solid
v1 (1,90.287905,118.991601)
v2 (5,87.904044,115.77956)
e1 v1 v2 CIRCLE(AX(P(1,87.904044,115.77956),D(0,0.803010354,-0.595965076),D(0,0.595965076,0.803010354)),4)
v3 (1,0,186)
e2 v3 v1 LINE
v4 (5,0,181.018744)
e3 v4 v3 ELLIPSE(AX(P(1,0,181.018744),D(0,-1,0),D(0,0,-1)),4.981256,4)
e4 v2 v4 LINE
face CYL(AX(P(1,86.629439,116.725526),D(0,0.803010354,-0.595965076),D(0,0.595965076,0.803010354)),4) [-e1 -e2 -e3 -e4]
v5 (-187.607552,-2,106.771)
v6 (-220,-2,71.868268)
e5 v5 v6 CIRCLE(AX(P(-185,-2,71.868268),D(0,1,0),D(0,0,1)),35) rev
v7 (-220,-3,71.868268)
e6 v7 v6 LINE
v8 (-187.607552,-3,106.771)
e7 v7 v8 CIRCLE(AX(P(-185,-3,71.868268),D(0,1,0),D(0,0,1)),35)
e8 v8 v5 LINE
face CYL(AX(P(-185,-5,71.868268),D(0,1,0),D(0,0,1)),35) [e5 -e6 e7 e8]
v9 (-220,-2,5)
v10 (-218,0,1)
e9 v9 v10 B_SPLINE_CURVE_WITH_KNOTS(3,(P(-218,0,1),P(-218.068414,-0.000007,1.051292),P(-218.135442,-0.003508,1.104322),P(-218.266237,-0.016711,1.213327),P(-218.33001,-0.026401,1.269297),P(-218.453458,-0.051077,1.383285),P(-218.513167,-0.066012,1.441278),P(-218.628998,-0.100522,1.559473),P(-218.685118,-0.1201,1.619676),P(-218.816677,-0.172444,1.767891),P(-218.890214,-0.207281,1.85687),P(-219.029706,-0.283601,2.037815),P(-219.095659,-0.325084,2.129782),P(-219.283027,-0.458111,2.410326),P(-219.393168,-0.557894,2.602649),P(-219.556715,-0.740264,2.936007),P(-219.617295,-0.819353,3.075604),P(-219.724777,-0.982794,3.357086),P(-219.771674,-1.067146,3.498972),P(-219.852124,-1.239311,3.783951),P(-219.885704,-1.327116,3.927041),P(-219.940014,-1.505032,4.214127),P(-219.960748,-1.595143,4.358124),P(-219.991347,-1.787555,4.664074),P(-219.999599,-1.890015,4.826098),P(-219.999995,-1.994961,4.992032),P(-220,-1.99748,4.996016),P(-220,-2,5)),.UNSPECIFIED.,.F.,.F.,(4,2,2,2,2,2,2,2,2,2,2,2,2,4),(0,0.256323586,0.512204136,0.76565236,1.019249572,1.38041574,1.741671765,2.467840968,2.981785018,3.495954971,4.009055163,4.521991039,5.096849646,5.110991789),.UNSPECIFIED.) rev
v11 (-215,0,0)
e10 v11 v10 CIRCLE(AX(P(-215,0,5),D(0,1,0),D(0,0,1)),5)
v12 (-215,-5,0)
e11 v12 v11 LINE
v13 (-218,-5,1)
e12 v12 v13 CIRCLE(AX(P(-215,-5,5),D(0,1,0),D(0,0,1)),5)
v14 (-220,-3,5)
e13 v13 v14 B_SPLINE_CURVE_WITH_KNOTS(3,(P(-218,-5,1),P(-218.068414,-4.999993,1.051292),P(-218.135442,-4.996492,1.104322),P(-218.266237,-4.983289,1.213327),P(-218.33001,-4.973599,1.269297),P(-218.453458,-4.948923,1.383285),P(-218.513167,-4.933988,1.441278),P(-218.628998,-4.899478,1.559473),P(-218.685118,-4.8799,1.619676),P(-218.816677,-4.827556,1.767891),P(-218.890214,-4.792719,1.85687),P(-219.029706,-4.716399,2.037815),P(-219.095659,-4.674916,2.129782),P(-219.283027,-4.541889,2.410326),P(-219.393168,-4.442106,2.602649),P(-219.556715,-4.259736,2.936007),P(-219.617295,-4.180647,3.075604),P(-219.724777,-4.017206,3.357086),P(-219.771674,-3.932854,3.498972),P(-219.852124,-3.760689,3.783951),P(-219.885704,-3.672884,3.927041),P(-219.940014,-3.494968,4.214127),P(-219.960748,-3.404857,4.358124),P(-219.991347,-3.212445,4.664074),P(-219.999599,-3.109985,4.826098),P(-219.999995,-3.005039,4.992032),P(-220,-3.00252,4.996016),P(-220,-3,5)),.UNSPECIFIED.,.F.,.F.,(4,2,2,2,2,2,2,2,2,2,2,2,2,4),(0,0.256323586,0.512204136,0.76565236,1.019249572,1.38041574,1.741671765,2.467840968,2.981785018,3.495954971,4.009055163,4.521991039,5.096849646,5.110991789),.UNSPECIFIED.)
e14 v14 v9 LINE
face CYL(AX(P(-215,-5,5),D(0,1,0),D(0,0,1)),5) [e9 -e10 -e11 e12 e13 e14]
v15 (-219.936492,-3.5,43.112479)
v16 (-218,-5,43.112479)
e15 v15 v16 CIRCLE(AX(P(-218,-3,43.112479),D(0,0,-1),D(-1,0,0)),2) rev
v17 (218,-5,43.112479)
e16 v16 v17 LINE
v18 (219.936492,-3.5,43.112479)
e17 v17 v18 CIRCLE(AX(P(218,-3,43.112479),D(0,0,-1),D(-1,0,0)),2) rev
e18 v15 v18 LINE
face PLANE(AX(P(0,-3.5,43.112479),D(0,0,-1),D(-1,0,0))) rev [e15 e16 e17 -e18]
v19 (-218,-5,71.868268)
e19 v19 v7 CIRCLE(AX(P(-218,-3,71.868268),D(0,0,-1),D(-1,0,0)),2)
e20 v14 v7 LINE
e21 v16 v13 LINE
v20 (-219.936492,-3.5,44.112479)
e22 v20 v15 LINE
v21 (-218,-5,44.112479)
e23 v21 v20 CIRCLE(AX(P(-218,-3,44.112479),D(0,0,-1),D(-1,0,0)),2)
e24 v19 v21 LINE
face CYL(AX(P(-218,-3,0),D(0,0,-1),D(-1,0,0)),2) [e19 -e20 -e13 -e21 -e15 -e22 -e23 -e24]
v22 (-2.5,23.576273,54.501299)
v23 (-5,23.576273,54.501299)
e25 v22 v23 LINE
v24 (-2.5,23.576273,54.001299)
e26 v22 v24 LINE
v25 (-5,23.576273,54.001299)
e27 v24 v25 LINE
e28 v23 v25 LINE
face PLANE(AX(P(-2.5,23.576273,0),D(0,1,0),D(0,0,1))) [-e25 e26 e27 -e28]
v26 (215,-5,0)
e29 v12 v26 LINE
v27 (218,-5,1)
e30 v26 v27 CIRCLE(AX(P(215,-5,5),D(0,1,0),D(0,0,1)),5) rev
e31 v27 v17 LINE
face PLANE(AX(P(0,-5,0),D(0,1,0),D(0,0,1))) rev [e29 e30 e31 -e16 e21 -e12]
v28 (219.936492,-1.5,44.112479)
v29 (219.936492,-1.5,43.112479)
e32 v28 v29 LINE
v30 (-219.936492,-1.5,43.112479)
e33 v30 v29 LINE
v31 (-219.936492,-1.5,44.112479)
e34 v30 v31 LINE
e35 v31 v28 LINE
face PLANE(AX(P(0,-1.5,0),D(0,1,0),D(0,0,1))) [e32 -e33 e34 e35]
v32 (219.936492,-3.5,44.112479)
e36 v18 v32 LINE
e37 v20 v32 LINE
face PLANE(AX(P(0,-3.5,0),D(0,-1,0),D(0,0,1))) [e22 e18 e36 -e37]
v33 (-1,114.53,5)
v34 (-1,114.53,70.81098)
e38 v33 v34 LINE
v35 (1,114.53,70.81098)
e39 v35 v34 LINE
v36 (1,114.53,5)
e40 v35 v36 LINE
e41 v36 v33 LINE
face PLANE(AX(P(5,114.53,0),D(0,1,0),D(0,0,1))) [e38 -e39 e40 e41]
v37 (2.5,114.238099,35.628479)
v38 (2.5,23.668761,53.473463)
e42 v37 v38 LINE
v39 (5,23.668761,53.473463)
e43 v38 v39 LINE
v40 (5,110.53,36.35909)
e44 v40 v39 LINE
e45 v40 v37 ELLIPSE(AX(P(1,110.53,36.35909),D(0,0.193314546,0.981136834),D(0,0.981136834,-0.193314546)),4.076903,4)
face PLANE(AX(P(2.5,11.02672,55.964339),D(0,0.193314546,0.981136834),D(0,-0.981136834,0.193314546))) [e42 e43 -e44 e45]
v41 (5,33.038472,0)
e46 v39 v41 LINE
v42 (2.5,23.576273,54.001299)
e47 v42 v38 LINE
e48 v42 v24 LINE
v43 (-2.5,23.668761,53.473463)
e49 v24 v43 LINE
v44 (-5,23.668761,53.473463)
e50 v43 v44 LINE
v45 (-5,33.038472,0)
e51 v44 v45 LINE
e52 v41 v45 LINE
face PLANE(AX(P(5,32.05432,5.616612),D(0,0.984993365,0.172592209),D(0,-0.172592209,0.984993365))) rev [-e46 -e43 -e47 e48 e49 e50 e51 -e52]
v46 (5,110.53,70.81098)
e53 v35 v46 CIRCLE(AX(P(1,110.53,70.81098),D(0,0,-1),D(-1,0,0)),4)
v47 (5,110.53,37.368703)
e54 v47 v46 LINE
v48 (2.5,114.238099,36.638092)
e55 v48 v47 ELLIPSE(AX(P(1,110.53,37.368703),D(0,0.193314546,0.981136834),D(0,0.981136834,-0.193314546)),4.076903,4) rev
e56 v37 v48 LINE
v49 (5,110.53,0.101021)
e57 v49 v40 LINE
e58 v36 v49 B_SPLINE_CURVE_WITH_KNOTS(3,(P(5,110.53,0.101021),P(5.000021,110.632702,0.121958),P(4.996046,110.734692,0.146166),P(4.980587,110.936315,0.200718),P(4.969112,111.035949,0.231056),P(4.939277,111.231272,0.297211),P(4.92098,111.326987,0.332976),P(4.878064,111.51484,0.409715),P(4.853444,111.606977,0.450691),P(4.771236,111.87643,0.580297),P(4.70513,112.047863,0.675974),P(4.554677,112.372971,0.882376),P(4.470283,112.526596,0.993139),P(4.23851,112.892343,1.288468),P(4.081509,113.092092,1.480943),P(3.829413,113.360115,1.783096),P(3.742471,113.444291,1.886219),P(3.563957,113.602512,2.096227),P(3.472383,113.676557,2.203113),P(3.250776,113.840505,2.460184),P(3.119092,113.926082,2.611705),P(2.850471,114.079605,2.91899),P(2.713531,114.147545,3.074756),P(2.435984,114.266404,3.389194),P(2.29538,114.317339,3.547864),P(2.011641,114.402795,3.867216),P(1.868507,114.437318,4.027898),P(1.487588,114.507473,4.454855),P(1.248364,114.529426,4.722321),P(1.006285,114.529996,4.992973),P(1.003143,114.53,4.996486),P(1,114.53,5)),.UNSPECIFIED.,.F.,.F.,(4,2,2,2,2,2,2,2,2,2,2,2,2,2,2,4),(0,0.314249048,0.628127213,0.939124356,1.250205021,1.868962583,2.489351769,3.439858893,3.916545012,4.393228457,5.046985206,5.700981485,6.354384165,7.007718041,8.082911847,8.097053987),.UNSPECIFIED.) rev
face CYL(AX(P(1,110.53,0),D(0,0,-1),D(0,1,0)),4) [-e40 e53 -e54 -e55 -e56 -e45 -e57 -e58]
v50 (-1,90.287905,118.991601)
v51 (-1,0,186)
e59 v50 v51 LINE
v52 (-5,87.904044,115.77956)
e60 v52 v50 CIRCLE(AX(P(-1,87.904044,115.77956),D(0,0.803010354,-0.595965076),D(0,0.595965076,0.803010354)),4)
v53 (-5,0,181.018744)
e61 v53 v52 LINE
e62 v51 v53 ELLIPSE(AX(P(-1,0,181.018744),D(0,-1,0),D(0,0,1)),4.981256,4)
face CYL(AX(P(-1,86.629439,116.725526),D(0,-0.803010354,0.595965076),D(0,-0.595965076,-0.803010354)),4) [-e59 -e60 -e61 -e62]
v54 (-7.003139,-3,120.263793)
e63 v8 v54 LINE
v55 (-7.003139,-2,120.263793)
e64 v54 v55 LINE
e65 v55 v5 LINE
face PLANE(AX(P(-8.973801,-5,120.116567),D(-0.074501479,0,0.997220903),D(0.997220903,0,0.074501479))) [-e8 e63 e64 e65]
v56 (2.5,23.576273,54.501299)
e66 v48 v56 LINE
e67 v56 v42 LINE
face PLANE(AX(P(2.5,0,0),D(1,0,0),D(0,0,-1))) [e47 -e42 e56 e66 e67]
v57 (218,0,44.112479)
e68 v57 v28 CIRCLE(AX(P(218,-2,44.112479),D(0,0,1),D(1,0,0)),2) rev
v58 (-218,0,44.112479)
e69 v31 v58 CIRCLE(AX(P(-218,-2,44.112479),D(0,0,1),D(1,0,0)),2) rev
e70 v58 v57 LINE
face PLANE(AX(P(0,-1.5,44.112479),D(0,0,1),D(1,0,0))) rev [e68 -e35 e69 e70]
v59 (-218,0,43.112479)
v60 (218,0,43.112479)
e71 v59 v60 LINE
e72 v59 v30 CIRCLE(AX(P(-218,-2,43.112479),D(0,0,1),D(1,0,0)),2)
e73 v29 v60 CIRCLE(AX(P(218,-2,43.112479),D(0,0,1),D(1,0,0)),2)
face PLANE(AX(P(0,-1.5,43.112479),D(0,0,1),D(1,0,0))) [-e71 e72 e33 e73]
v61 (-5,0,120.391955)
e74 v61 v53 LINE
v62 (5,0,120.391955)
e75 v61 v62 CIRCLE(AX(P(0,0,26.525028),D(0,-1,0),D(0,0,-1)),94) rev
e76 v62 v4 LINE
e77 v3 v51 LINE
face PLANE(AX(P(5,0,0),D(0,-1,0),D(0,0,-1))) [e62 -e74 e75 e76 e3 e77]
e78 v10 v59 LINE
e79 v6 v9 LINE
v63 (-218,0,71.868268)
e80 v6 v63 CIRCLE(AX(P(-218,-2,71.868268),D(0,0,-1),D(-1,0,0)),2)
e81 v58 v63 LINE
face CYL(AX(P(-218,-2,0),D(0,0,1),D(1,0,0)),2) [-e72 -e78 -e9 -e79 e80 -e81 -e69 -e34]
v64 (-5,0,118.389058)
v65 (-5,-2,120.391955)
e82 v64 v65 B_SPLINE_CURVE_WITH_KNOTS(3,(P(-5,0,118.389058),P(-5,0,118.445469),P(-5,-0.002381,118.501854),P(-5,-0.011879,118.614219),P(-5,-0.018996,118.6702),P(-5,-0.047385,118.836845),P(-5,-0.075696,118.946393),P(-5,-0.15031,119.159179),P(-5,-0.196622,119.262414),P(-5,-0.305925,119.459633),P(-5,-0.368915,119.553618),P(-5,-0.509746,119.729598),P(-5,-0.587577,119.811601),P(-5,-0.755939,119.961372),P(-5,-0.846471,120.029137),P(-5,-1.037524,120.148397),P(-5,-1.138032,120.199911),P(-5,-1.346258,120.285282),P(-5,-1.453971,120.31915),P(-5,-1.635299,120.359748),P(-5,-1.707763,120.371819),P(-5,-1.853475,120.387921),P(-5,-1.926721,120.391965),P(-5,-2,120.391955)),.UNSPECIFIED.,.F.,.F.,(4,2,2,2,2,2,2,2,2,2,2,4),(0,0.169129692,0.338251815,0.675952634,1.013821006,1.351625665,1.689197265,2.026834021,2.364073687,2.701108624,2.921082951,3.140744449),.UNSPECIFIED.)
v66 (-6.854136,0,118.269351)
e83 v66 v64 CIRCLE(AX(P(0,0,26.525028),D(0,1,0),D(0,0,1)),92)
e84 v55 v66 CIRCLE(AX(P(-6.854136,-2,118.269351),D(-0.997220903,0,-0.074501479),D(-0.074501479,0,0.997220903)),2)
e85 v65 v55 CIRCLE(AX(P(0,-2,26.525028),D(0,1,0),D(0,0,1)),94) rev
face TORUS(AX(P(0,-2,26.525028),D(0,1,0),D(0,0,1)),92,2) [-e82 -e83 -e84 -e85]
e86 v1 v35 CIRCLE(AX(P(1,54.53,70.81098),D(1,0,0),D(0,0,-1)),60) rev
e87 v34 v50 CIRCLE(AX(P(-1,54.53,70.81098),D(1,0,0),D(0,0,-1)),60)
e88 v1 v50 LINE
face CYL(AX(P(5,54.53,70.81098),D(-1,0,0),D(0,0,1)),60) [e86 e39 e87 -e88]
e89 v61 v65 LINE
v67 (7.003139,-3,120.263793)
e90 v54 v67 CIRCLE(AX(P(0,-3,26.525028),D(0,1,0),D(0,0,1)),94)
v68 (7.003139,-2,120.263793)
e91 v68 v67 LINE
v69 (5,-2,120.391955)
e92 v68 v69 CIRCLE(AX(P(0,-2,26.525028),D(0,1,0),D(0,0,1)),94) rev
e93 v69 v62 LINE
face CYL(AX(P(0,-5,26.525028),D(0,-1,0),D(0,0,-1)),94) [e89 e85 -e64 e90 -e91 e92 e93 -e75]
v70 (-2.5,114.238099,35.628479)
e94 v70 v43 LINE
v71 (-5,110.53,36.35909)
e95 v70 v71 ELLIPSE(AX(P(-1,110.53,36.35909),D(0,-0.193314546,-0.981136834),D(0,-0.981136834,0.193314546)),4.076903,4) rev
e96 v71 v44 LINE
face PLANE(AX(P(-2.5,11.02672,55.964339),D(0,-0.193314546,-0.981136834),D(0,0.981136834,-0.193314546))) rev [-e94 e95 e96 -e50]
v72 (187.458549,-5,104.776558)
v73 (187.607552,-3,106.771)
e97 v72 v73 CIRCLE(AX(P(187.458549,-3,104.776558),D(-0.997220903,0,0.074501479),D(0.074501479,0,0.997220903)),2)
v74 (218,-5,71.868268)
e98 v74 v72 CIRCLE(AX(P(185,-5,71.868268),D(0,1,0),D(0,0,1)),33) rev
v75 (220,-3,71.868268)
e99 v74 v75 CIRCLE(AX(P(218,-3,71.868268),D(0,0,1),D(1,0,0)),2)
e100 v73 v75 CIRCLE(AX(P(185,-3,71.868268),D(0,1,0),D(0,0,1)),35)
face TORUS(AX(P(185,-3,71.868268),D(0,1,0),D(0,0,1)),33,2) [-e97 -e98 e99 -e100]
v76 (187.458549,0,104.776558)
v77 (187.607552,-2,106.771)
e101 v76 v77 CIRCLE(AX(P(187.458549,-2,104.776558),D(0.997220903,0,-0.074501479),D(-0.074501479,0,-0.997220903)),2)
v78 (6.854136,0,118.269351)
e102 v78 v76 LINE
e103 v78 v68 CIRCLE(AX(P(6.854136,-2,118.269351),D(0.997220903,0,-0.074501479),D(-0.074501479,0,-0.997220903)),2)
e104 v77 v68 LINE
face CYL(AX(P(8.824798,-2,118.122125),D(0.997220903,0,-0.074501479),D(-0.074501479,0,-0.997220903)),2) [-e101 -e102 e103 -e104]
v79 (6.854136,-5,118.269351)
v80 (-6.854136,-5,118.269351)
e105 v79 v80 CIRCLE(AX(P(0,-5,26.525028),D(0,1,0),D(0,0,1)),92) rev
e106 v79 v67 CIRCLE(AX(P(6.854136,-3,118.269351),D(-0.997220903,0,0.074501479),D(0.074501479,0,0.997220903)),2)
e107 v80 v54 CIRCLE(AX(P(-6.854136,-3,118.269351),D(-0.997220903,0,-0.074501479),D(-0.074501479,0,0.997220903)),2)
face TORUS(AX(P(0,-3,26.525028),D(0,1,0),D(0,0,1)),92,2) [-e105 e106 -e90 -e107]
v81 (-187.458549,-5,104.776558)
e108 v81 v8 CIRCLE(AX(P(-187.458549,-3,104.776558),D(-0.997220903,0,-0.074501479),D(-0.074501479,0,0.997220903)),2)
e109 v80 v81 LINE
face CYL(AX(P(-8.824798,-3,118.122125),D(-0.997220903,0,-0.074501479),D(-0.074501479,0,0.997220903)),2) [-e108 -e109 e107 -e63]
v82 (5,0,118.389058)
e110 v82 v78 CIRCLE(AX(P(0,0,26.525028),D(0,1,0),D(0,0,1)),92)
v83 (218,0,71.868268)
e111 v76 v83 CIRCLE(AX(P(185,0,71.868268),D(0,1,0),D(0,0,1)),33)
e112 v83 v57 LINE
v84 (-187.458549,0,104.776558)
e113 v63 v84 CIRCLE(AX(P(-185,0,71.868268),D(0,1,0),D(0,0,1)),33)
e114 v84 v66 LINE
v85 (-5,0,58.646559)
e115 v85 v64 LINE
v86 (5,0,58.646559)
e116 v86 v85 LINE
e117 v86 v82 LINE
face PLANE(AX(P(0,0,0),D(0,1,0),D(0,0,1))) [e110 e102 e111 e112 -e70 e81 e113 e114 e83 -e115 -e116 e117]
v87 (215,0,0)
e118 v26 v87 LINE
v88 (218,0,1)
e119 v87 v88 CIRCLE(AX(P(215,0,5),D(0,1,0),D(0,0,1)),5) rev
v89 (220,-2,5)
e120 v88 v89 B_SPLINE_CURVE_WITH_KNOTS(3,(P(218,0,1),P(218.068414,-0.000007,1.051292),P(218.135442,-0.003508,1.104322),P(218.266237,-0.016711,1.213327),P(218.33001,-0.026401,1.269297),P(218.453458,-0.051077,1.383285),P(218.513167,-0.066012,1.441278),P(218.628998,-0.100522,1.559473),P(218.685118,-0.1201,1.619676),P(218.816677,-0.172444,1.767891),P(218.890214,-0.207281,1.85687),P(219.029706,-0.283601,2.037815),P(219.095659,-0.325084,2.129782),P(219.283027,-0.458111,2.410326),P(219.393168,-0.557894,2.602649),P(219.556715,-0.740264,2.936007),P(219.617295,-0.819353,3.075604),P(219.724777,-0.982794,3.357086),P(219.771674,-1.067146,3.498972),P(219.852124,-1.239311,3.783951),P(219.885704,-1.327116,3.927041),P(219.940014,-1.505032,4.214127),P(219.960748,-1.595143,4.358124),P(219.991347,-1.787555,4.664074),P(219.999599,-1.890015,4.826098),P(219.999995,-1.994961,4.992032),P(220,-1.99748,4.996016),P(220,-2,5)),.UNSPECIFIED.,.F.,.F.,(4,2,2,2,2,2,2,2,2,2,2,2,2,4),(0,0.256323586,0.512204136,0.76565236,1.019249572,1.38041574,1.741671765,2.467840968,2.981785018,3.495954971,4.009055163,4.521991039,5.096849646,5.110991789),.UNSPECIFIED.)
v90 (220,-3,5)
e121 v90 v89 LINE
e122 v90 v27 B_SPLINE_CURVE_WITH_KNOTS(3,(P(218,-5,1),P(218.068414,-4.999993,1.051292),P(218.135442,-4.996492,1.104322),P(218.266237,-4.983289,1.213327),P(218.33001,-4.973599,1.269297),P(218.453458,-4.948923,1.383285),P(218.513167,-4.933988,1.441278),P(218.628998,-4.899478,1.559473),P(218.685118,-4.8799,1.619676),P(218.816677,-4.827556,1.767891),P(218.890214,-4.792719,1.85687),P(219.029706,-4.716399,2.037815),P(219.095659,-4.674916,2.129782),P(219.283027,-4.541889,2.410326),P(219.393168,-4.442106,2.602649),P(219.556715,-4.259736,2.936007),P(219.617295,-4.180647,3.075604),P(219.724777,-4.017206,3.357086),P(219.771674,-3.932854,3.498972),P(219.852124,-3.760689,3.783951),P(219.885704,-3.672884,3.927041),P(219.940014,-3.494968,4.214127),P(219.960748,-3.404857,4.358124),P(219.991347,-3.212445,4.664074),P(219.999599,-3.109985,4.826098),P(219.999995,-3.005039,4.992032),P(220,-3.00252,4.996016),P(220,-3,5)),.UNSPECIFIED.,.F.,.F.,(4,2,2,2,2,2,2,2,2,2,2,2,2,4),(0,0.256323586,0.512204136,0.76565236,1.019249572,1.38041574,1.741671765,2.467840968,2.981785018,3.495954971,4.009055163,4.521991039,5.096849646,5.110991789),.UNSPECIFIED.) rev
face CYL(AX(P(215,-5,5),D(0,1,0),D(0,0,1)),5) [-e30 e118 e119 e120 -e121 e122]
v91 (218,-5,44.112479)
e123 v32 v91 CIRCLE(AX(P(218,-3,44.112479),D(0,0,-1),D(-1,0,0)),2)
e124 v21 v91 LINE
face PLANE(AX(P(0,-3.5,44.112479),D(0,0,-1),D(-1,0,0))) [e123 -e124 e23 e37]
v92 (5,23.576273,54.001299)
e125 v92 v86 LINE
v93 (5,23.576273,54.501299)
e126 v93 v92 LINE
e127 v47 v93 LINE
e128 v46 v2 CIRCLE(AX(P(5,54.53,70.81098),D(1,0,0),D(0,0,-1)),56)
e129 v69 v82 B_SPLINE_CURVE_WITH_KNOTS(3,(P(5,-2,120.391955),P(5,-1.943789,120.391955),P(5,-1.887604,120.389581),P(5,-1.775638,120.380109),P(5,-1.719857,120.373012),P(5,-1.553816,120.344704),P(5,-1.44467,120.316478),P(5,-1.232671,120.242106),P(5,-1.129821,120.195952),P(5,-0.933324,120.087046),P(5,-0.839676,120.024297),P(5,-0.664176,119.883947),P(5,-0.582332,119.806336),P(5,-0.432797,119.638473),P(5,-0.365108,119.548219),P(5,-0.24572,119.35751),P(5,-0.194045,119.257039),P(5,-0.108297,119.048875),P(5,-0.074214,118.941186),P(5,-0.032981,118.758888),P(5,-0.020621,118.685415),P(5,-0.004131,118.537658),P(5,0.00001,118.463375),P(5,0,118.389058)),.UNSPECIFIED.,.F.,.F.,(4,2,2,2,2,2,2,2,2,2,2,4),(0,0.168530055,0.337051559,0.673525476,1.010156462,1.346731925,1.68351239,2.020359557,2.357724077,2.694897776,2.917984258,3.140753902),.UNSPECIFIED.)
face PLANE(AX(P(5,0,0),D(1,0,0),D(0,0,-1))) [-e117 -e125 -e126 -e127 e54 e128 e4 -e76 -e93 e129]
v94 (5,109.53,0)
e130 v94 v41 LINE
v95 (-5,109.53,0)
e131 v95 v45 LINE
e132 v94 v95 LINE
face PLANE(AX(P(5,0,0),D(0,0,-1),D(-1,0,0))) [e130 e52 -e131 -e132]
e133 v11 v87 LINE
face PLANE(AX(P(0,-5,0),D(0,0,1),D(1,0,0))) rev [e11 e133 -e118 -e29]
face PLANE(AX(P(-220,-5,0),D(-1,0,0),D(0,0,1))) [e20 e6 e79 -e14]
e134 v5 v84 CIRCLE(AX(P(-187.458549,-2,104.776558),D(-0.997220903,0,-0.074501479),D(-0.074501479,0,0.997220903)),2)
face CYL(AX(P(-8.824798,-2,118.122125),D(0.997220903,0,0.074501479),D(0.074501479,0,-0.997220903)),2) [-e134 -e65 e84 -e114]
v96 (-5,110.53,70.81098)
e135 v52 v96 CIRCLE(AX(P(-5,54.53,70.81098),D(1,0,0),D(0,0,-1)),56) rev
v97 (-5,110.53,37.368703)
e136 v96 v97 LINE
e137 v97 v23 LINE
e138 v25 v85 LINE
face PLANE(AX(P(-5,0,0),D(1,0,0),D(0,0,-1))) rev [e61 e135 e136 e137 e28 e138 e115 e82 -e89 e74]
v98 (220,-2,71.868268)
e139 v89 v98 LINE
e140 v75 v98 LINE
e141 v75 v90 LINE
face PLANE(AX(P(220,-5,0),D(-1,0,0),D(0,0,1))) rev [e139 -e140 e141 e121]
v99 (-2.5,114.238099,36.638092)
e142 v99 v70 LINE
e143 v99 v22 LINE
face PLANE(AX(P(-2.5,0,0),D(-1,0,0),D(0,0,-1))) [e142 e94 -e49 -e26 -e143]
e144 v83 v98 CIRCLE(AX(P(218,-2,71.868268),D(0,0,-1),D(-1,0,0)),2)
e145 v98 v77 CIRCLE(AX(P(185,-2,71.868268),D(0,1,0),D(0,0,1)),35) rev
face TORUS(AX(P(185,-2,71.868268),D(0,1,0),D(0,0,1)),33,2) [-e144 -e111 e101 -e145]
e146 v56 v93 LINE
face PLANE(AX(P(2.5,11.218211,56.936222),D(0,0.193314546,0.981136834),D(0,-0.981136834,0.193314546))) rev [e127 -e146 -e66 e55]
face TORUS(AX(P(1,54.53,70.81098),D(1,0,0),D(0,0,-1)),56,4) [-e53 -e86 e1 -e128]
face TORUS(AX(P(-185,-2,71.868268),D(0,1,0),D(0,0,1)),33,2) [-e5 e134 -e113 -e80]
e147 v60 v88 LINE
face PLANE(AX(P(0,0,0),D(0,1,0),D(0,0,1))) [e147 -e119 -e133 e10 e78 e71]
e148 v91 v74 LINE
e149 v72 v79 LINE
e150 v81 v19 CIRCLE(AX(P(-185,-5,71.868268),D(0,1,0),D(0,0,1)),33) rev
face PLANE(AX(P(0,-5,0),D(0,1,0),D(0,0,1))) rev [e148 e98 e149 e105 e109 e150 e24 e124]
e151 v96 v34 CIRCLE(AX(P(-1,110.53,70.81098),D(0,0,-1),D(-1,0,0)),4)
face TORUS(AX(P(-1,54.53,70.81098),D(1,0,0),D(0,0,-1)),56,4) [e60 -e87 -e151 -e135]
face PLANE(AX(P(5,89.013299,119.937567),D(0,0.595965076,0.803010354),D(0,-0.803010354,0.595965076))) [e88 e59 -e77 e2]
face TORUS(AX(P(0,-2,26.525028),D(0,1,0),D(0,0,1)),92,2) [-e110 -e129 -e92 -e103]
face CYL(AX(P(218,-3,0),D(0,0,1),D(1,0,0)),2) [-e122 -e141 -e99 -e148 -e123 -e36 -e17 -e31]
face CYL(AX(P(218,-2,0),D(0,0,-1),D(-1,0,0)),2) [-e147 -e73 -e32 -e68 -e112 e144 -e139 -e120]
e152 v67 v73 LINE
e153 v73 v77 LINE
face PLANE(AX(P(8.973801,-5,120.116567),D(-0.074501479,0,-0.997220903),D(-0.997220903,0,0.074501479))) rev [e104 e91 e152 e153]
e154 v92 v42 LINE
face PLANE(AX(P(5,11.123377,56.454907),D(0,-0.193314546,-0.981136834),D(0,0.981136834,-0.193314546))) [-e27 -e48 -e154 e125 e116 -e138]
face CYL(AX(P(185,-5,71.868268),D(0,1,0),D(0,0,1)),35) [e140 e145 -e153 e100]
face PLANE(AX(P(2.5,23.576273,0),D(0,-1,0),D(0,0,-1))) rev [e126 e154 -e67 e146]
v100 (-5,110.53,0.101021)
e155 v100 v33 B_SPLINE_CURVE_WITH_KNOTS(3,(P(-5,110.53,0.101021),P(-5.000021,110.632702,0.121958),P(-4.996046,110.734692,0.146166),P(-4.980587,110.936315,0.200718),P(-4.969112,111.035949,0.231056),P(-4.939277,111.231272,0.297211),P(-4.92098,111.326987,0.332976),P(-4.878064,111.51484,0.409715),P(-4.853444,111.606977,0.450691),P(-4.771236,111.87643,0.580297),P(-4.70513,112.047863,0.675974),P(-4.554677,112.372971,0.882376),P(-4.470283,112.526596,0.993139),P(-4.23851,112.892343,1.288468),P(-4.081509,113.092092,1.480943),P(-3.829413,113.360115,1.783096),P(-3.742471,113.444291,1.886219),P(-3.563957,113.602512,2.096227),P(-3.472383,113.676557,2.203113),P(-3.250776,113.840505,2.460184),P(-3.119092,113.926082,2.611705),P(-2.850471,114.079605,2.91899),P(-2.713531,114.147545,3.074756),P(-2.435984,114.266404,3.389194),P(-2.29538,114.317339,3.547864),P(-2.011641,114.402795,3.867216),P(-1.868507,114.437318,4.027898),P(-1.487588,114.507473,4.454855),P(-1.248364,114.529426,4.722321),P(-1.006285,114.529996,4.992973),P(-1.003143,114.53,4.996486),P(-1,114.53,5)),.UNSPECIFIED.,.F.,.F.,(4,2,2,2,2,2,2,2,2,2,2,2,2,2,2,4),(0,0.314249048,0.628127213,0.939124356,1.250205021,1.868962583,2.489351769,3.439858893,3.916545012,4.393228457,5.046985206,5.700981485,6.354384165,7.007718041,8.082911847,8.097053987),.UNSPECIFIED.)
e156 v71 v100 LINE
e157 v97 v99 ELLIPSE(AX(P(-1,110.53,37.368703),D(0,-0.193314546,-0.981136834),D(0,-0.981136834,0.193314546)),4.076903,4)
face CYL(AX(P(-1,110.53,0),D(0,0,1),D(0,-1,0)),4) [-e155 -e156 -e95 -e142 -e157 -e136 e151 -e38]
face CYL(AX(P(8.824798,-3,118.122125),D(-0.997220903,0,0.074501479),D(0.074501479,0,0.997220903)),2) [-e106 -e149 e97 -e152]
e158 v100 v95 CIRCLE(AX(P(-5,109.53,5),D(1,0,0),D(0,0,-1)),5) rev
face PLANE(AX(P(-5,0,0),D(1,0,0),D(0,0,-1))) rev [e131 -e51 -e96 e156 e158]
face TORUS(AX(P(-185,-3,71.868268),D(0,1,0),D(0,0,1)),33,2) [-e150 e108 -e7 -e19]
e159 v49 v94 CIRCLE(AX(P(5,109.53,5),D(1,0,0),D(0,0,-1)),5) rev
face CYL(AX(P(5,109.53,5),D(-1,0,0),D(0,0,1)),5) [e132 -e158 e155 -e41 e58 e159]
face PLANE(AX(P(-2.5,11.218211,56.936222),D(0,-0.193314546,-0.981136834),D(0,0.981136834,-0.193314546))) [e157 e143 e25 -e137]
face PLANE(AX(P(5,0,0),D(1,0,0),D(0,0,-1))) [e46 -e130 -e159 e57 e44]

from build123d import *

# Parameters (mm, degrees)
BOSS_EXTRUDE1_DEPTH = 5
CUT_EXTRUDE1_DEPTH  = 2.5
FILLET1_R           = 4
SKETCH4_W           = 220
SKETCH4_H           = 0.5
BOSS_EXTRUDE2_DEPTH = 5
FILLET2_R           = 94
SKETCH4_3_W         = 220
SKETCH4_3_H         = 0.5
CUT_EXTRUDE2_DEPTH  = 1.5
FILLET3_R           = 2


with BuildPart() as part:
    # Sketch1 → Boss-Extrude1 (new, symmetric)
    with BuildSketch(Plane(origin=(0, 0, 0), x_dir=(0, 0, -1), z_dir=(1, 0, 0))):
        with BuildLine():
            Line((-186, 0), (-58.646559411, 0))
            Line((-58.646559411, 0), (-54.001298593, 23.576272927))
            Line((-54.001298593, 23.576272927), (-36.080578642, 114.53))
            Line((-36.080578642, 114.53), (-70.810980212, 114.53))
            ThreePointArc((-70.810980212, 114.53), (-97.778791842, 108.127921004), (-118.991601457, 90.28790453))
            Line((-118.991601457, 90.28790453), (-186, 0))
        make_face()
        with BuildLine():
            Line((-54.001298593, 23.576272927), (0, 33.038472112))
            Line((0, 33.038472112), (0, 109.53))
            ThreePointArc((0, 109.53), (-1.464466094, 113.065533906), (-5, 114.53))
            Line((-5, 114.53), (-36.080578642, 114.53))
            Line((-36.080578642, 114.53), (-54.001298593, 23.576272927))
        make_face()
    extrude(amount=BOSS_EXTRUDE1_DEPTH, both=True)

    # Sketch3 → Cut-Extrude1 (cut)
    with BuildSketch(Plane(origin=(5, 0, 0), x_dir=(0, 0, -1), z_dir=(1, 0, 0))):
        Polygon((-36.080578642, 114.53), (-54.001298593, 23.576272927), (-53.473462597, 23.668761246), (-35.570965729, 114.53), align=None)
        Polygon((-54.501298593, 23.576272927), (-54.001298593, 23.576272927), (-36.080578642, 114.53), (-36.580578642, 114.53), align=None)
    cut_extrude1 = extrude(amount=-CUT_EXTRUDE1_DEPTH, mode=Mode.SUBTRACT)

    # Mirror1: Cut-Extrude1 across plane
    add(cut_extrude1.mirror(Plane(origin=(0, 0, 0), x_dir=(0, 0, 1), z_dir=(1, 0, 0))), mode=Mode.SUBTRACT)

    # Fillet1
    # the kernel refuses this fillet: 4 mm, written as the material it takes off along each edge
    with BuildSketch(Plane(origin=(5, 90.28790453, 118.991601457), x_dir=(0, -0.5959650755061177, -0.8030103540907723), z_dir=(0, -0.8030103540907724, 0.5959650755061177))) as fillet1_piece_1:
        with BuildLine():
            CenterArc((FILLET1_R, -FILLET1_R), FILLET1_R, 90, 90)
            Line((0, -FILLET1_R), (0, 0))
            Line((0, 0), (FILLET1_R, 0))
        make_face()
    extrude(amount=122.436787484, mode=Mode.SUBTRACT)
    with BuildSketch(Plane(origin=(-5, 90.28790453, 118.991601457), x_dir=(0, -0.5959650755061177, -0.8030103540907723), z_dir=(0, -0.8030103540907724, 0.5959650755061177))) as fillet1_piece_2:
        with BuildLine():
            CenterArc((FILLET1_R, FILLET1_R), FILLET1_R, 180, 90)
            Line((0, FILLET1_R), (0, 0))
            Line((0, 0), (FILLET1_R, 0))
        make_face()
    extrude(amount=122.436787484, mode=Mode.SUBTRACT)
    with BuildSketch(Plane(origin=(-5, 54.53, 70.810980212), x_dir=(0, 1, 0), z_dir=(0, 0, -1))) as fillet1_piece_3:
        with BuildLine():
            CenterArc((60 - FILLET1_R, FILLET1_R), FILLET1_R, 270, 90)
            Line((60, FILLET1_R), (60, 0))
            Line((60, 0), (60 - FILLET1_R, 0))
        make_face()
    revolve(axis=Axis((-5, 54.53, 70.810980212), (1, 0, 0)), revolution_arc=53.418539238, mode=Mode.SUBTRACT)
    with BuildSketch(Plane(origin=(5, 114.53, -5), x_dir=(-1, 0, 0), z_dir=(0, 0, 1)), Plane(origin=(-5, 114.53, 45.570965729), x_dir=(1, 0, 0), z_dir=(0, 0, -1))) as fillet1_piece_4:
        with BuildLine():
            CenterArc((FILLET1_R, FILLET1_R), FILLET1_R, 180, 90)
            Line((0, FILLET1_R), (0, 0))
            Line((0, 0), (FILLET1_R, 0))
        make_face()
    extrude(amount=50.570965729, mode=Mode.SUBTRACT)
    with BuildSketch(Plane(origin=(5, 114.53, 26.580578642), x_dir=(0, -1, 0), z_dir=(0, 0, 1)), Plane(origin=(-5, 114.53, 70.810980212), x_dir=(0, -1, 0), z_dir=(0, 0, -1))) as fillet1_piece_5:
        with BuildLine():
            CenterArc((FILLET1_R, -FILLET1_R), FILLET1_R, 90, 90)
            Line((0, -FILLET1_R), (0, 0))
            Line((0, 0), (FILLET1_R, 0))
        make_face()
    extrude(amount=44.23040157, mode=Mode.SUBTRACT)
    with BuildSketch(Plane(origin=(5, 54.53, 70.810980212), x_dir=(0, 1, 0), z_dir=(0, 0, -1))) as fillet1_piece_6:
        with BuildLine():
            CenterArc((60 - FILLET1_R, -FILLET1_R), FILLET1_R, 0, 90)
            Line((60, -FILLET1_R), (60, 0))
            Line((60, 0), (60 - FILLET1_R, 0))
        make_face()
    revolve(axis=Axis((5, 54.53, 70.810980212), (1, 0, 0)), revolution_arc=53.418539238, mode=Mode.SUBTRACT)

    # Sketch4 → Boss-Extrude2 (add)
    with BuildSketch(Plane(origin=(0, 0, 0), x_dir=(1, 0, 0), z_dir=(0, 1, 0))):
        with BuildLine():
            Line((0, -120.786991444), (0, -44.112479236))
            Line((0, -44.112479236), (-220, -44.112479236))
            Line((-220, -44.112479236), (-220, -71.868268015))
            ThreePointArc((-220, -71.868268015), (-210.65408653, -95.677254644), (-187.607551754, -106.770999625))
            Line((-187.607551754, -106.770999625), (0, -120.786991444))
        make_face()
        with Locations((-110, -43.862479236)):
            Rectangle(SKETCH4_W, SKETCH4_H)
        with Locations((-110, -43.362479236)):
            Rectangle(SKETCH4_W, SKETCH4_H)
        with BuildLine():
            Line((0, -43.112479236), (0, 0))
            Line((0, 0), (-215, 0))
            ThreePointArc((-215, 0), (-218.535533906, -1.464466094), (-220, -5))
            Line((-220, -5), (-220, -43.112479236))
            Line((-220, -43.112479236), (0, -43.112479236))
        make_face()
        with BuildLine():
            Line((220, -44.112479236), (0, -44.112479236))
            Line((0, -44.112479236), (0, -120.786991444))
            Line((0, -120.786991444), (187.607551754, -106.770999625))
            ThreePointArc((187.607551754, -106.770999625), (210.65408653, -95.677254644), (220, -71.868268015))
            Line((220, -71.868268015), (220, -44.112479236))
        make_face()
        with Locations((110, -43.862479236)):
            Rectangle(SKETCH4_W, SKETCH4_H)
        with Locations((110, -43.362479236)):
            Rectangle(SKETCH4_W, SKETCH4_H)
        with BuildLine():
            Line((215, 0), (0, 0))
            Line((0, 0), (0, -43.112479236))
            Line((0, -43.112479236), (220, -43.112479236))
            Line((220, -43.112479236), (220, -5))
            ThreePointArc((220, -5), (218.535533906, -1.464466094), (215, 0))
        make_face()
    extrude(amount=-BOSS_EXTRUDE2_DEPTH)

    # Fillet2
    # the kernel refuses this fillet: 94 mm, written as the material it takes off along each edge
    with BuildSketch(Plane(origin=(0, 0, 120.786991444), x_dir=(0.9972209031466417, 0, -0.07450147869268323), z_dir=(0, -1, 0))) as fillet2_piece_1:
        with BuildLine():
            CenterArc((FILLET2_R * 0.0747091025244, -FILLET2_R), FILLET2_R, 90, 8.545158001)
            Line((-FILLET2_R * 0.0738797612109, -FILLET2_R * 0.0111009406548), (0, 0))
            Line((0, 0), (FILLET2_R * 0.0747091025244, 0))
        make_face()
    extrude(amount=22.556639093, mode=Mode.SUBTRACT)

    # Sketch4<3> → Cut-Extrude2 (cut)
    with BuildSketch(Plane(origin=(0, 0, 0), x_dir=(1, 0, 0), z_dir=(0, 1, 0))):
        with Locations((110, -43.362479236)):
            Rectangle(SKETCH4_3_W, SKETCH4_3_H)
        with Locations((110, -43.862479236)):
            Rectangle(SKETCH4_3_W, SKETCH4_3_H)
        with Locations((-110, -43.862479236)):
            Rectangle(SKETCH4_3_W, SKETCH4_3_H)
        with Locations((-110, -43.362479236)):
            Rectangle(SKETCH4_3_W, SKETCH4_3_H)
    cut_extrude2 = extrude(amount=-CUT_EXTRUDE2_DEPTH, mode=Mode.SUBTRACT)

    # Mirror2: Cut-Extrude2 across plane
    add(cut_extrude2.mirror(Plane.ZX.offset(-2.5)), mode=Mode.SUBTRACT)

    # Fillet3
    # the kernel refuses this fillet: 2 mm, written as the material it takes off along each edge
    with BuildSketch(Plane(origin=(-220, 0, 0), x_dir=(0, -1, 0), z_dir=(0, 0, 1)), Plane(origin=(220, 0, 48.112479236), x_dir=(0, -1, 0), z_dir=(0, 0, -1)), Plane(origin=(-220, -5, 48.112479236), x_dir=(0, 1, 0), z_dir=(0, 0, -1))) as fillet3_piece_1:
        with BuildLine():
            CenterArc((FILLET3_R, FILLET3_R), FILLET3_R, 180, 90)
            Line((0, FILLET3_R), (0, 0))
            Line((0, 0), (FILLET3_R, 0))
        make_face()
    extrude(amount=48.112479236, mode=Mode.SUBTRACT)
    with BuildSketch(Plane(origin=(-185, 0, 71.868268015), x_dir=(-1, 0, 0), z_dir=(0, 0, -1))) as fillet3_piece_2:
        with BuildLine():
            CenterArc((35 - FILLET3_R, -FILLET3_R), FILLET3_R, 0, 90)
            Line((35, -FILLET3_R), (35, 0))
            Line((35, 0), (35 - FILLET3_R, 0))
        make_face()
    revolve(axis=Axis((-185, 0, 71.868268015), (0, 1, 0)), revolution_arc=85.727420999, mode=Mode.SUBTRACT)
    with BuildSketch(Plane(origin=(-187.607551754, 0, 106.770999625), x_dir=(0.07450147869268282, 0, -0.9972209031466417), z_dir=(0.9972209031466417, 0, 0.07450147869268281)), Plane(origin=(7.003138997, 0, 120.263793214), x_dir=(-0.07450147869268252, 0, -0.9972209031466418), z_dir=(0.9972209031466418, 0, -0.07450147869268252)), Plane(origin=(-187.607551754, -5, 106.770999625), x_dir=(0, 1, 0), z_dir=(0.9972209031466417, 0, 0.07450147869268281))) as fillet3_piece_3:
        with BuildLine():
            CenterArc((FILLET3_R, -FILLET3_R), FILLET3_R, 90, 90)
            Line((0, -FILLET3_R), (0, 0))
            Line((0, 0), (FILLET3_R, 0))
        make_face()
    extrude(amount=181.107728676, mode=Mode.SUBTRACT)
    with BuildSketch(Plane(origin=(185, 0, 71.868268015), x_dir=(0.07450147869267976, 0, 0.997220903146642), z_dir=(-0.997220903146642, 0, 0.07450147869267976))) as fillet3_piece_4:
        with BuildLine():
            CenterArc((35 - FILLET3_R, -FILLET3_R), FILLET3_R, 0, 90)
            Line((35, -FILLET3_R), (35, 0))
            Line((35, 0), (35 - FILLET3_R, 0))
        make_face()
    revolve(axis=Axis((185, 0, 71.868268015), (0, 1, 0)), revolution_arc=85.727420999, mode=Mode.SUBTRACT)
    with BuildSketch(Plane(origin=(-185, -5, 71.868268015), x_dir=(-1, 0, 0), z_dir=(0, 0, -1))) as fillet3_piece_5:
        with BuildLine():
            CenterArc((35 - FILLET3_R, FILLET3_R), FILLET3_R, 270, 90)
            Line((35, FILLET3_R), (35, 0))
            Line((35, 0), (35 - FILLET3_R, 0))
        make_face()
    revolve(axis=Axis((-185, -5, 71.868268015), (0, 1, 0)), revolution_arc=85.727420999, mode=Mode.SUBTRACT)
    with BuildSketch(Plane(origin=(220, -5, 48.112479236), x_dir=(0, 1, 0), z_dir=(0, 0, -1))) as fillet3_piece_6:
        with BuildLine():
            CenterArc((FILLET3_R, -FILLET3_R), FILLET3_R, 90, 90)
            Line((0, -FILLET3_R), (0, 0))
            Line((0, 0), (FILLET3_R, 0))
        make_face()
    extrude(amount=48.112479236, mode=Mode.SUBTRACT)
    with BuildSketch(Plane(origin=(185, -5, 71.868268015), x_dir=(0.07450147869267976, 0, 0.997220903146642), z_dir=(-0.997220903146642, 0, 0.07450147869267976))) as fillet3_piece_7:
        with BuildLine():
            CenterArc((35 - FILLET3_R, FILLET3_R), FILLET3_R, 270, 90)
            Line((35, FILLET3_R), (35, 0))
            Line((35, 0), (35 - FILLET3_R, 0))
        make_face()
    revolve(axis=Axis((185, -5, 71.868268015), (0, 1, 0)), revolution_arc=85.727420999, mode=Mode.SUBTRACT)
    with BuildSketch(Plane(origin=(7.003138997, -5, 120.263793214), x_dir=(-0.07450147869268252, 0, -0.9972209031466418), z_dir=(0.9972209031466418, 0, -0.07450147869268252))) as fillet3_piece_8:
        with BuildLine():
            CenterArc((FILLET3_R, FILLET3_R), FILLET3_R, 180, 90)
            Line((0, FILLET3_R), (0, 0))
            Line((0, 0), (FILLET3_R, 0))
        make_face()
    extrude(amount=181.107728676, mode=Mode.SUBTRACT)
    with BuildSketch(Plane(origin=(0, 0, 26.525028319), x_dir=(0.07450147869297168, 0, 0.9972209031466202), z_dir=(0.9972209031466202, 0, -0.07450147869297168))) as fillet3_piece_9_section:
        with BuildLine():
            CenterArc((94 - FILLET3_R, FILLET3_R), FILLET3_R, 270, 90)
            Line((94 - FILLET3_R, 0), (94, 0))
            Line((94, 0), (94, FILLET3_R))
        make_face()
    fillet3_piece_9 = revolve(axis=Axis((0, 0, 26.525028319), (0, -1, 0)), revolution_arc=4.271140258, mode=Mode.PRIVATE)
    fillet3_piece_9 = split(fillet3_piece_9, bisect_by=Plane(origin=(5, 0, 26.525028319), z_dir=(1, 0, 0)), keep=Keep.TOP, mode=Mode.PRIVATE)
    add(fillet3_piece_9, mode=Mode.SUBTRACT)
    with BuildSketch(Plane(origin=(0, 0, 26.525028319), x_dir=(-2.511079423467498e-05, 0, 0.999999999684724), z_dir=(0.999999999684724, 0, 2.511079423467498e-05))) as fillet3_piece_10_section:
        with BuildLine():
            CenterArc((94 - FILLET3_R, FILLET3_R), FILLET3_R, 270, 90)
            Line((94 - FILLET3_R, 0), (94, 0))
            Line((94, 0), (94, FILLET3_R))
        make_face()
    fillet3_piece_10 = revolve(axis=Axis((0, 0, 26.525028319), (0, -1, 0)), revolution_arc=4.271140258, mode=Mode.PRIVATE)
    fillet3_piece_10 = split(fillet3_piece_10, bisect_by=Plane(origin=(-5, 0, 26.525028319), z_dir=(-1, 0, 0)), keep=Keep.TOP, mode=Mode.PRIVATE)
    add(fillet3_piece_10, mode=Mode.SUBTRACT)
    with BuildSketch(Plane(origin=(0, -5, 26.525028319), x_dir=(-0.07450147869238784, 0, 0.9972209031466637), z_dir=(-0.9972209031466637, 0, -0.07450147869238784))) as fillet3_piece_11:
        with BuildLine():
            CenterArc((94 - FILLET3_R, FILLET3_R), FILLET3_R, 270, 90)
            Line((94 - FILLET3_R, 0), (94, 0))
            Line((94, 0), (94, FILLET3_R))
        make_face()
    revolve(axis=Axis((0, -5, 26.525028319), (0, 1, 0)), revolution_arc=8.545158001, mode=Mode.SUBTRACT)
    with BuildSketch(Plane(origin=(-220, 0, 39.112479236), x_dir=(1, 0, 0), z_dir=(0, 0, 1)), Plane(origin=(220, 0, 71.868268015), x_dir=(-1, 0, 0), z_dir=(0, 0, -1)), Plane(origin=(-220, -5, 71.868268015), x_dir=(1, 0, 0), z_dir=(0, 0, -1))) as fillet3_piece_12:
        with BuildLine():
            CenterArc((FILLET3_R, -FILLET3_R), FILLET3_R, 90, 90)
            Line((0, -FILLET3_R), (0, 0))
            Line((0, 0), (FILLET3_R, 0))
        make_face()
    extrude(amount=32.755788779, mode=Mode.SUBTRACT)
    with BuildSketch(Plane(origin=(220, -5, 71.868268015), x_dir=(-1, 0, 0), z_dir=(0, 0, -1))) as fillet3_piece_13:
        with BuildLine():
            CenterArc((FILLET3_R, FILLET3_R), FILLET3_R, 180, 90)
            Line((0, FILLET3_R), (0, 0))
            Line((0, 0), (FILLET3_R, 0))
        make_face()
    extrude(amount=32.755788779, mode=Mode.SUBTRACT)


solid = part.part
